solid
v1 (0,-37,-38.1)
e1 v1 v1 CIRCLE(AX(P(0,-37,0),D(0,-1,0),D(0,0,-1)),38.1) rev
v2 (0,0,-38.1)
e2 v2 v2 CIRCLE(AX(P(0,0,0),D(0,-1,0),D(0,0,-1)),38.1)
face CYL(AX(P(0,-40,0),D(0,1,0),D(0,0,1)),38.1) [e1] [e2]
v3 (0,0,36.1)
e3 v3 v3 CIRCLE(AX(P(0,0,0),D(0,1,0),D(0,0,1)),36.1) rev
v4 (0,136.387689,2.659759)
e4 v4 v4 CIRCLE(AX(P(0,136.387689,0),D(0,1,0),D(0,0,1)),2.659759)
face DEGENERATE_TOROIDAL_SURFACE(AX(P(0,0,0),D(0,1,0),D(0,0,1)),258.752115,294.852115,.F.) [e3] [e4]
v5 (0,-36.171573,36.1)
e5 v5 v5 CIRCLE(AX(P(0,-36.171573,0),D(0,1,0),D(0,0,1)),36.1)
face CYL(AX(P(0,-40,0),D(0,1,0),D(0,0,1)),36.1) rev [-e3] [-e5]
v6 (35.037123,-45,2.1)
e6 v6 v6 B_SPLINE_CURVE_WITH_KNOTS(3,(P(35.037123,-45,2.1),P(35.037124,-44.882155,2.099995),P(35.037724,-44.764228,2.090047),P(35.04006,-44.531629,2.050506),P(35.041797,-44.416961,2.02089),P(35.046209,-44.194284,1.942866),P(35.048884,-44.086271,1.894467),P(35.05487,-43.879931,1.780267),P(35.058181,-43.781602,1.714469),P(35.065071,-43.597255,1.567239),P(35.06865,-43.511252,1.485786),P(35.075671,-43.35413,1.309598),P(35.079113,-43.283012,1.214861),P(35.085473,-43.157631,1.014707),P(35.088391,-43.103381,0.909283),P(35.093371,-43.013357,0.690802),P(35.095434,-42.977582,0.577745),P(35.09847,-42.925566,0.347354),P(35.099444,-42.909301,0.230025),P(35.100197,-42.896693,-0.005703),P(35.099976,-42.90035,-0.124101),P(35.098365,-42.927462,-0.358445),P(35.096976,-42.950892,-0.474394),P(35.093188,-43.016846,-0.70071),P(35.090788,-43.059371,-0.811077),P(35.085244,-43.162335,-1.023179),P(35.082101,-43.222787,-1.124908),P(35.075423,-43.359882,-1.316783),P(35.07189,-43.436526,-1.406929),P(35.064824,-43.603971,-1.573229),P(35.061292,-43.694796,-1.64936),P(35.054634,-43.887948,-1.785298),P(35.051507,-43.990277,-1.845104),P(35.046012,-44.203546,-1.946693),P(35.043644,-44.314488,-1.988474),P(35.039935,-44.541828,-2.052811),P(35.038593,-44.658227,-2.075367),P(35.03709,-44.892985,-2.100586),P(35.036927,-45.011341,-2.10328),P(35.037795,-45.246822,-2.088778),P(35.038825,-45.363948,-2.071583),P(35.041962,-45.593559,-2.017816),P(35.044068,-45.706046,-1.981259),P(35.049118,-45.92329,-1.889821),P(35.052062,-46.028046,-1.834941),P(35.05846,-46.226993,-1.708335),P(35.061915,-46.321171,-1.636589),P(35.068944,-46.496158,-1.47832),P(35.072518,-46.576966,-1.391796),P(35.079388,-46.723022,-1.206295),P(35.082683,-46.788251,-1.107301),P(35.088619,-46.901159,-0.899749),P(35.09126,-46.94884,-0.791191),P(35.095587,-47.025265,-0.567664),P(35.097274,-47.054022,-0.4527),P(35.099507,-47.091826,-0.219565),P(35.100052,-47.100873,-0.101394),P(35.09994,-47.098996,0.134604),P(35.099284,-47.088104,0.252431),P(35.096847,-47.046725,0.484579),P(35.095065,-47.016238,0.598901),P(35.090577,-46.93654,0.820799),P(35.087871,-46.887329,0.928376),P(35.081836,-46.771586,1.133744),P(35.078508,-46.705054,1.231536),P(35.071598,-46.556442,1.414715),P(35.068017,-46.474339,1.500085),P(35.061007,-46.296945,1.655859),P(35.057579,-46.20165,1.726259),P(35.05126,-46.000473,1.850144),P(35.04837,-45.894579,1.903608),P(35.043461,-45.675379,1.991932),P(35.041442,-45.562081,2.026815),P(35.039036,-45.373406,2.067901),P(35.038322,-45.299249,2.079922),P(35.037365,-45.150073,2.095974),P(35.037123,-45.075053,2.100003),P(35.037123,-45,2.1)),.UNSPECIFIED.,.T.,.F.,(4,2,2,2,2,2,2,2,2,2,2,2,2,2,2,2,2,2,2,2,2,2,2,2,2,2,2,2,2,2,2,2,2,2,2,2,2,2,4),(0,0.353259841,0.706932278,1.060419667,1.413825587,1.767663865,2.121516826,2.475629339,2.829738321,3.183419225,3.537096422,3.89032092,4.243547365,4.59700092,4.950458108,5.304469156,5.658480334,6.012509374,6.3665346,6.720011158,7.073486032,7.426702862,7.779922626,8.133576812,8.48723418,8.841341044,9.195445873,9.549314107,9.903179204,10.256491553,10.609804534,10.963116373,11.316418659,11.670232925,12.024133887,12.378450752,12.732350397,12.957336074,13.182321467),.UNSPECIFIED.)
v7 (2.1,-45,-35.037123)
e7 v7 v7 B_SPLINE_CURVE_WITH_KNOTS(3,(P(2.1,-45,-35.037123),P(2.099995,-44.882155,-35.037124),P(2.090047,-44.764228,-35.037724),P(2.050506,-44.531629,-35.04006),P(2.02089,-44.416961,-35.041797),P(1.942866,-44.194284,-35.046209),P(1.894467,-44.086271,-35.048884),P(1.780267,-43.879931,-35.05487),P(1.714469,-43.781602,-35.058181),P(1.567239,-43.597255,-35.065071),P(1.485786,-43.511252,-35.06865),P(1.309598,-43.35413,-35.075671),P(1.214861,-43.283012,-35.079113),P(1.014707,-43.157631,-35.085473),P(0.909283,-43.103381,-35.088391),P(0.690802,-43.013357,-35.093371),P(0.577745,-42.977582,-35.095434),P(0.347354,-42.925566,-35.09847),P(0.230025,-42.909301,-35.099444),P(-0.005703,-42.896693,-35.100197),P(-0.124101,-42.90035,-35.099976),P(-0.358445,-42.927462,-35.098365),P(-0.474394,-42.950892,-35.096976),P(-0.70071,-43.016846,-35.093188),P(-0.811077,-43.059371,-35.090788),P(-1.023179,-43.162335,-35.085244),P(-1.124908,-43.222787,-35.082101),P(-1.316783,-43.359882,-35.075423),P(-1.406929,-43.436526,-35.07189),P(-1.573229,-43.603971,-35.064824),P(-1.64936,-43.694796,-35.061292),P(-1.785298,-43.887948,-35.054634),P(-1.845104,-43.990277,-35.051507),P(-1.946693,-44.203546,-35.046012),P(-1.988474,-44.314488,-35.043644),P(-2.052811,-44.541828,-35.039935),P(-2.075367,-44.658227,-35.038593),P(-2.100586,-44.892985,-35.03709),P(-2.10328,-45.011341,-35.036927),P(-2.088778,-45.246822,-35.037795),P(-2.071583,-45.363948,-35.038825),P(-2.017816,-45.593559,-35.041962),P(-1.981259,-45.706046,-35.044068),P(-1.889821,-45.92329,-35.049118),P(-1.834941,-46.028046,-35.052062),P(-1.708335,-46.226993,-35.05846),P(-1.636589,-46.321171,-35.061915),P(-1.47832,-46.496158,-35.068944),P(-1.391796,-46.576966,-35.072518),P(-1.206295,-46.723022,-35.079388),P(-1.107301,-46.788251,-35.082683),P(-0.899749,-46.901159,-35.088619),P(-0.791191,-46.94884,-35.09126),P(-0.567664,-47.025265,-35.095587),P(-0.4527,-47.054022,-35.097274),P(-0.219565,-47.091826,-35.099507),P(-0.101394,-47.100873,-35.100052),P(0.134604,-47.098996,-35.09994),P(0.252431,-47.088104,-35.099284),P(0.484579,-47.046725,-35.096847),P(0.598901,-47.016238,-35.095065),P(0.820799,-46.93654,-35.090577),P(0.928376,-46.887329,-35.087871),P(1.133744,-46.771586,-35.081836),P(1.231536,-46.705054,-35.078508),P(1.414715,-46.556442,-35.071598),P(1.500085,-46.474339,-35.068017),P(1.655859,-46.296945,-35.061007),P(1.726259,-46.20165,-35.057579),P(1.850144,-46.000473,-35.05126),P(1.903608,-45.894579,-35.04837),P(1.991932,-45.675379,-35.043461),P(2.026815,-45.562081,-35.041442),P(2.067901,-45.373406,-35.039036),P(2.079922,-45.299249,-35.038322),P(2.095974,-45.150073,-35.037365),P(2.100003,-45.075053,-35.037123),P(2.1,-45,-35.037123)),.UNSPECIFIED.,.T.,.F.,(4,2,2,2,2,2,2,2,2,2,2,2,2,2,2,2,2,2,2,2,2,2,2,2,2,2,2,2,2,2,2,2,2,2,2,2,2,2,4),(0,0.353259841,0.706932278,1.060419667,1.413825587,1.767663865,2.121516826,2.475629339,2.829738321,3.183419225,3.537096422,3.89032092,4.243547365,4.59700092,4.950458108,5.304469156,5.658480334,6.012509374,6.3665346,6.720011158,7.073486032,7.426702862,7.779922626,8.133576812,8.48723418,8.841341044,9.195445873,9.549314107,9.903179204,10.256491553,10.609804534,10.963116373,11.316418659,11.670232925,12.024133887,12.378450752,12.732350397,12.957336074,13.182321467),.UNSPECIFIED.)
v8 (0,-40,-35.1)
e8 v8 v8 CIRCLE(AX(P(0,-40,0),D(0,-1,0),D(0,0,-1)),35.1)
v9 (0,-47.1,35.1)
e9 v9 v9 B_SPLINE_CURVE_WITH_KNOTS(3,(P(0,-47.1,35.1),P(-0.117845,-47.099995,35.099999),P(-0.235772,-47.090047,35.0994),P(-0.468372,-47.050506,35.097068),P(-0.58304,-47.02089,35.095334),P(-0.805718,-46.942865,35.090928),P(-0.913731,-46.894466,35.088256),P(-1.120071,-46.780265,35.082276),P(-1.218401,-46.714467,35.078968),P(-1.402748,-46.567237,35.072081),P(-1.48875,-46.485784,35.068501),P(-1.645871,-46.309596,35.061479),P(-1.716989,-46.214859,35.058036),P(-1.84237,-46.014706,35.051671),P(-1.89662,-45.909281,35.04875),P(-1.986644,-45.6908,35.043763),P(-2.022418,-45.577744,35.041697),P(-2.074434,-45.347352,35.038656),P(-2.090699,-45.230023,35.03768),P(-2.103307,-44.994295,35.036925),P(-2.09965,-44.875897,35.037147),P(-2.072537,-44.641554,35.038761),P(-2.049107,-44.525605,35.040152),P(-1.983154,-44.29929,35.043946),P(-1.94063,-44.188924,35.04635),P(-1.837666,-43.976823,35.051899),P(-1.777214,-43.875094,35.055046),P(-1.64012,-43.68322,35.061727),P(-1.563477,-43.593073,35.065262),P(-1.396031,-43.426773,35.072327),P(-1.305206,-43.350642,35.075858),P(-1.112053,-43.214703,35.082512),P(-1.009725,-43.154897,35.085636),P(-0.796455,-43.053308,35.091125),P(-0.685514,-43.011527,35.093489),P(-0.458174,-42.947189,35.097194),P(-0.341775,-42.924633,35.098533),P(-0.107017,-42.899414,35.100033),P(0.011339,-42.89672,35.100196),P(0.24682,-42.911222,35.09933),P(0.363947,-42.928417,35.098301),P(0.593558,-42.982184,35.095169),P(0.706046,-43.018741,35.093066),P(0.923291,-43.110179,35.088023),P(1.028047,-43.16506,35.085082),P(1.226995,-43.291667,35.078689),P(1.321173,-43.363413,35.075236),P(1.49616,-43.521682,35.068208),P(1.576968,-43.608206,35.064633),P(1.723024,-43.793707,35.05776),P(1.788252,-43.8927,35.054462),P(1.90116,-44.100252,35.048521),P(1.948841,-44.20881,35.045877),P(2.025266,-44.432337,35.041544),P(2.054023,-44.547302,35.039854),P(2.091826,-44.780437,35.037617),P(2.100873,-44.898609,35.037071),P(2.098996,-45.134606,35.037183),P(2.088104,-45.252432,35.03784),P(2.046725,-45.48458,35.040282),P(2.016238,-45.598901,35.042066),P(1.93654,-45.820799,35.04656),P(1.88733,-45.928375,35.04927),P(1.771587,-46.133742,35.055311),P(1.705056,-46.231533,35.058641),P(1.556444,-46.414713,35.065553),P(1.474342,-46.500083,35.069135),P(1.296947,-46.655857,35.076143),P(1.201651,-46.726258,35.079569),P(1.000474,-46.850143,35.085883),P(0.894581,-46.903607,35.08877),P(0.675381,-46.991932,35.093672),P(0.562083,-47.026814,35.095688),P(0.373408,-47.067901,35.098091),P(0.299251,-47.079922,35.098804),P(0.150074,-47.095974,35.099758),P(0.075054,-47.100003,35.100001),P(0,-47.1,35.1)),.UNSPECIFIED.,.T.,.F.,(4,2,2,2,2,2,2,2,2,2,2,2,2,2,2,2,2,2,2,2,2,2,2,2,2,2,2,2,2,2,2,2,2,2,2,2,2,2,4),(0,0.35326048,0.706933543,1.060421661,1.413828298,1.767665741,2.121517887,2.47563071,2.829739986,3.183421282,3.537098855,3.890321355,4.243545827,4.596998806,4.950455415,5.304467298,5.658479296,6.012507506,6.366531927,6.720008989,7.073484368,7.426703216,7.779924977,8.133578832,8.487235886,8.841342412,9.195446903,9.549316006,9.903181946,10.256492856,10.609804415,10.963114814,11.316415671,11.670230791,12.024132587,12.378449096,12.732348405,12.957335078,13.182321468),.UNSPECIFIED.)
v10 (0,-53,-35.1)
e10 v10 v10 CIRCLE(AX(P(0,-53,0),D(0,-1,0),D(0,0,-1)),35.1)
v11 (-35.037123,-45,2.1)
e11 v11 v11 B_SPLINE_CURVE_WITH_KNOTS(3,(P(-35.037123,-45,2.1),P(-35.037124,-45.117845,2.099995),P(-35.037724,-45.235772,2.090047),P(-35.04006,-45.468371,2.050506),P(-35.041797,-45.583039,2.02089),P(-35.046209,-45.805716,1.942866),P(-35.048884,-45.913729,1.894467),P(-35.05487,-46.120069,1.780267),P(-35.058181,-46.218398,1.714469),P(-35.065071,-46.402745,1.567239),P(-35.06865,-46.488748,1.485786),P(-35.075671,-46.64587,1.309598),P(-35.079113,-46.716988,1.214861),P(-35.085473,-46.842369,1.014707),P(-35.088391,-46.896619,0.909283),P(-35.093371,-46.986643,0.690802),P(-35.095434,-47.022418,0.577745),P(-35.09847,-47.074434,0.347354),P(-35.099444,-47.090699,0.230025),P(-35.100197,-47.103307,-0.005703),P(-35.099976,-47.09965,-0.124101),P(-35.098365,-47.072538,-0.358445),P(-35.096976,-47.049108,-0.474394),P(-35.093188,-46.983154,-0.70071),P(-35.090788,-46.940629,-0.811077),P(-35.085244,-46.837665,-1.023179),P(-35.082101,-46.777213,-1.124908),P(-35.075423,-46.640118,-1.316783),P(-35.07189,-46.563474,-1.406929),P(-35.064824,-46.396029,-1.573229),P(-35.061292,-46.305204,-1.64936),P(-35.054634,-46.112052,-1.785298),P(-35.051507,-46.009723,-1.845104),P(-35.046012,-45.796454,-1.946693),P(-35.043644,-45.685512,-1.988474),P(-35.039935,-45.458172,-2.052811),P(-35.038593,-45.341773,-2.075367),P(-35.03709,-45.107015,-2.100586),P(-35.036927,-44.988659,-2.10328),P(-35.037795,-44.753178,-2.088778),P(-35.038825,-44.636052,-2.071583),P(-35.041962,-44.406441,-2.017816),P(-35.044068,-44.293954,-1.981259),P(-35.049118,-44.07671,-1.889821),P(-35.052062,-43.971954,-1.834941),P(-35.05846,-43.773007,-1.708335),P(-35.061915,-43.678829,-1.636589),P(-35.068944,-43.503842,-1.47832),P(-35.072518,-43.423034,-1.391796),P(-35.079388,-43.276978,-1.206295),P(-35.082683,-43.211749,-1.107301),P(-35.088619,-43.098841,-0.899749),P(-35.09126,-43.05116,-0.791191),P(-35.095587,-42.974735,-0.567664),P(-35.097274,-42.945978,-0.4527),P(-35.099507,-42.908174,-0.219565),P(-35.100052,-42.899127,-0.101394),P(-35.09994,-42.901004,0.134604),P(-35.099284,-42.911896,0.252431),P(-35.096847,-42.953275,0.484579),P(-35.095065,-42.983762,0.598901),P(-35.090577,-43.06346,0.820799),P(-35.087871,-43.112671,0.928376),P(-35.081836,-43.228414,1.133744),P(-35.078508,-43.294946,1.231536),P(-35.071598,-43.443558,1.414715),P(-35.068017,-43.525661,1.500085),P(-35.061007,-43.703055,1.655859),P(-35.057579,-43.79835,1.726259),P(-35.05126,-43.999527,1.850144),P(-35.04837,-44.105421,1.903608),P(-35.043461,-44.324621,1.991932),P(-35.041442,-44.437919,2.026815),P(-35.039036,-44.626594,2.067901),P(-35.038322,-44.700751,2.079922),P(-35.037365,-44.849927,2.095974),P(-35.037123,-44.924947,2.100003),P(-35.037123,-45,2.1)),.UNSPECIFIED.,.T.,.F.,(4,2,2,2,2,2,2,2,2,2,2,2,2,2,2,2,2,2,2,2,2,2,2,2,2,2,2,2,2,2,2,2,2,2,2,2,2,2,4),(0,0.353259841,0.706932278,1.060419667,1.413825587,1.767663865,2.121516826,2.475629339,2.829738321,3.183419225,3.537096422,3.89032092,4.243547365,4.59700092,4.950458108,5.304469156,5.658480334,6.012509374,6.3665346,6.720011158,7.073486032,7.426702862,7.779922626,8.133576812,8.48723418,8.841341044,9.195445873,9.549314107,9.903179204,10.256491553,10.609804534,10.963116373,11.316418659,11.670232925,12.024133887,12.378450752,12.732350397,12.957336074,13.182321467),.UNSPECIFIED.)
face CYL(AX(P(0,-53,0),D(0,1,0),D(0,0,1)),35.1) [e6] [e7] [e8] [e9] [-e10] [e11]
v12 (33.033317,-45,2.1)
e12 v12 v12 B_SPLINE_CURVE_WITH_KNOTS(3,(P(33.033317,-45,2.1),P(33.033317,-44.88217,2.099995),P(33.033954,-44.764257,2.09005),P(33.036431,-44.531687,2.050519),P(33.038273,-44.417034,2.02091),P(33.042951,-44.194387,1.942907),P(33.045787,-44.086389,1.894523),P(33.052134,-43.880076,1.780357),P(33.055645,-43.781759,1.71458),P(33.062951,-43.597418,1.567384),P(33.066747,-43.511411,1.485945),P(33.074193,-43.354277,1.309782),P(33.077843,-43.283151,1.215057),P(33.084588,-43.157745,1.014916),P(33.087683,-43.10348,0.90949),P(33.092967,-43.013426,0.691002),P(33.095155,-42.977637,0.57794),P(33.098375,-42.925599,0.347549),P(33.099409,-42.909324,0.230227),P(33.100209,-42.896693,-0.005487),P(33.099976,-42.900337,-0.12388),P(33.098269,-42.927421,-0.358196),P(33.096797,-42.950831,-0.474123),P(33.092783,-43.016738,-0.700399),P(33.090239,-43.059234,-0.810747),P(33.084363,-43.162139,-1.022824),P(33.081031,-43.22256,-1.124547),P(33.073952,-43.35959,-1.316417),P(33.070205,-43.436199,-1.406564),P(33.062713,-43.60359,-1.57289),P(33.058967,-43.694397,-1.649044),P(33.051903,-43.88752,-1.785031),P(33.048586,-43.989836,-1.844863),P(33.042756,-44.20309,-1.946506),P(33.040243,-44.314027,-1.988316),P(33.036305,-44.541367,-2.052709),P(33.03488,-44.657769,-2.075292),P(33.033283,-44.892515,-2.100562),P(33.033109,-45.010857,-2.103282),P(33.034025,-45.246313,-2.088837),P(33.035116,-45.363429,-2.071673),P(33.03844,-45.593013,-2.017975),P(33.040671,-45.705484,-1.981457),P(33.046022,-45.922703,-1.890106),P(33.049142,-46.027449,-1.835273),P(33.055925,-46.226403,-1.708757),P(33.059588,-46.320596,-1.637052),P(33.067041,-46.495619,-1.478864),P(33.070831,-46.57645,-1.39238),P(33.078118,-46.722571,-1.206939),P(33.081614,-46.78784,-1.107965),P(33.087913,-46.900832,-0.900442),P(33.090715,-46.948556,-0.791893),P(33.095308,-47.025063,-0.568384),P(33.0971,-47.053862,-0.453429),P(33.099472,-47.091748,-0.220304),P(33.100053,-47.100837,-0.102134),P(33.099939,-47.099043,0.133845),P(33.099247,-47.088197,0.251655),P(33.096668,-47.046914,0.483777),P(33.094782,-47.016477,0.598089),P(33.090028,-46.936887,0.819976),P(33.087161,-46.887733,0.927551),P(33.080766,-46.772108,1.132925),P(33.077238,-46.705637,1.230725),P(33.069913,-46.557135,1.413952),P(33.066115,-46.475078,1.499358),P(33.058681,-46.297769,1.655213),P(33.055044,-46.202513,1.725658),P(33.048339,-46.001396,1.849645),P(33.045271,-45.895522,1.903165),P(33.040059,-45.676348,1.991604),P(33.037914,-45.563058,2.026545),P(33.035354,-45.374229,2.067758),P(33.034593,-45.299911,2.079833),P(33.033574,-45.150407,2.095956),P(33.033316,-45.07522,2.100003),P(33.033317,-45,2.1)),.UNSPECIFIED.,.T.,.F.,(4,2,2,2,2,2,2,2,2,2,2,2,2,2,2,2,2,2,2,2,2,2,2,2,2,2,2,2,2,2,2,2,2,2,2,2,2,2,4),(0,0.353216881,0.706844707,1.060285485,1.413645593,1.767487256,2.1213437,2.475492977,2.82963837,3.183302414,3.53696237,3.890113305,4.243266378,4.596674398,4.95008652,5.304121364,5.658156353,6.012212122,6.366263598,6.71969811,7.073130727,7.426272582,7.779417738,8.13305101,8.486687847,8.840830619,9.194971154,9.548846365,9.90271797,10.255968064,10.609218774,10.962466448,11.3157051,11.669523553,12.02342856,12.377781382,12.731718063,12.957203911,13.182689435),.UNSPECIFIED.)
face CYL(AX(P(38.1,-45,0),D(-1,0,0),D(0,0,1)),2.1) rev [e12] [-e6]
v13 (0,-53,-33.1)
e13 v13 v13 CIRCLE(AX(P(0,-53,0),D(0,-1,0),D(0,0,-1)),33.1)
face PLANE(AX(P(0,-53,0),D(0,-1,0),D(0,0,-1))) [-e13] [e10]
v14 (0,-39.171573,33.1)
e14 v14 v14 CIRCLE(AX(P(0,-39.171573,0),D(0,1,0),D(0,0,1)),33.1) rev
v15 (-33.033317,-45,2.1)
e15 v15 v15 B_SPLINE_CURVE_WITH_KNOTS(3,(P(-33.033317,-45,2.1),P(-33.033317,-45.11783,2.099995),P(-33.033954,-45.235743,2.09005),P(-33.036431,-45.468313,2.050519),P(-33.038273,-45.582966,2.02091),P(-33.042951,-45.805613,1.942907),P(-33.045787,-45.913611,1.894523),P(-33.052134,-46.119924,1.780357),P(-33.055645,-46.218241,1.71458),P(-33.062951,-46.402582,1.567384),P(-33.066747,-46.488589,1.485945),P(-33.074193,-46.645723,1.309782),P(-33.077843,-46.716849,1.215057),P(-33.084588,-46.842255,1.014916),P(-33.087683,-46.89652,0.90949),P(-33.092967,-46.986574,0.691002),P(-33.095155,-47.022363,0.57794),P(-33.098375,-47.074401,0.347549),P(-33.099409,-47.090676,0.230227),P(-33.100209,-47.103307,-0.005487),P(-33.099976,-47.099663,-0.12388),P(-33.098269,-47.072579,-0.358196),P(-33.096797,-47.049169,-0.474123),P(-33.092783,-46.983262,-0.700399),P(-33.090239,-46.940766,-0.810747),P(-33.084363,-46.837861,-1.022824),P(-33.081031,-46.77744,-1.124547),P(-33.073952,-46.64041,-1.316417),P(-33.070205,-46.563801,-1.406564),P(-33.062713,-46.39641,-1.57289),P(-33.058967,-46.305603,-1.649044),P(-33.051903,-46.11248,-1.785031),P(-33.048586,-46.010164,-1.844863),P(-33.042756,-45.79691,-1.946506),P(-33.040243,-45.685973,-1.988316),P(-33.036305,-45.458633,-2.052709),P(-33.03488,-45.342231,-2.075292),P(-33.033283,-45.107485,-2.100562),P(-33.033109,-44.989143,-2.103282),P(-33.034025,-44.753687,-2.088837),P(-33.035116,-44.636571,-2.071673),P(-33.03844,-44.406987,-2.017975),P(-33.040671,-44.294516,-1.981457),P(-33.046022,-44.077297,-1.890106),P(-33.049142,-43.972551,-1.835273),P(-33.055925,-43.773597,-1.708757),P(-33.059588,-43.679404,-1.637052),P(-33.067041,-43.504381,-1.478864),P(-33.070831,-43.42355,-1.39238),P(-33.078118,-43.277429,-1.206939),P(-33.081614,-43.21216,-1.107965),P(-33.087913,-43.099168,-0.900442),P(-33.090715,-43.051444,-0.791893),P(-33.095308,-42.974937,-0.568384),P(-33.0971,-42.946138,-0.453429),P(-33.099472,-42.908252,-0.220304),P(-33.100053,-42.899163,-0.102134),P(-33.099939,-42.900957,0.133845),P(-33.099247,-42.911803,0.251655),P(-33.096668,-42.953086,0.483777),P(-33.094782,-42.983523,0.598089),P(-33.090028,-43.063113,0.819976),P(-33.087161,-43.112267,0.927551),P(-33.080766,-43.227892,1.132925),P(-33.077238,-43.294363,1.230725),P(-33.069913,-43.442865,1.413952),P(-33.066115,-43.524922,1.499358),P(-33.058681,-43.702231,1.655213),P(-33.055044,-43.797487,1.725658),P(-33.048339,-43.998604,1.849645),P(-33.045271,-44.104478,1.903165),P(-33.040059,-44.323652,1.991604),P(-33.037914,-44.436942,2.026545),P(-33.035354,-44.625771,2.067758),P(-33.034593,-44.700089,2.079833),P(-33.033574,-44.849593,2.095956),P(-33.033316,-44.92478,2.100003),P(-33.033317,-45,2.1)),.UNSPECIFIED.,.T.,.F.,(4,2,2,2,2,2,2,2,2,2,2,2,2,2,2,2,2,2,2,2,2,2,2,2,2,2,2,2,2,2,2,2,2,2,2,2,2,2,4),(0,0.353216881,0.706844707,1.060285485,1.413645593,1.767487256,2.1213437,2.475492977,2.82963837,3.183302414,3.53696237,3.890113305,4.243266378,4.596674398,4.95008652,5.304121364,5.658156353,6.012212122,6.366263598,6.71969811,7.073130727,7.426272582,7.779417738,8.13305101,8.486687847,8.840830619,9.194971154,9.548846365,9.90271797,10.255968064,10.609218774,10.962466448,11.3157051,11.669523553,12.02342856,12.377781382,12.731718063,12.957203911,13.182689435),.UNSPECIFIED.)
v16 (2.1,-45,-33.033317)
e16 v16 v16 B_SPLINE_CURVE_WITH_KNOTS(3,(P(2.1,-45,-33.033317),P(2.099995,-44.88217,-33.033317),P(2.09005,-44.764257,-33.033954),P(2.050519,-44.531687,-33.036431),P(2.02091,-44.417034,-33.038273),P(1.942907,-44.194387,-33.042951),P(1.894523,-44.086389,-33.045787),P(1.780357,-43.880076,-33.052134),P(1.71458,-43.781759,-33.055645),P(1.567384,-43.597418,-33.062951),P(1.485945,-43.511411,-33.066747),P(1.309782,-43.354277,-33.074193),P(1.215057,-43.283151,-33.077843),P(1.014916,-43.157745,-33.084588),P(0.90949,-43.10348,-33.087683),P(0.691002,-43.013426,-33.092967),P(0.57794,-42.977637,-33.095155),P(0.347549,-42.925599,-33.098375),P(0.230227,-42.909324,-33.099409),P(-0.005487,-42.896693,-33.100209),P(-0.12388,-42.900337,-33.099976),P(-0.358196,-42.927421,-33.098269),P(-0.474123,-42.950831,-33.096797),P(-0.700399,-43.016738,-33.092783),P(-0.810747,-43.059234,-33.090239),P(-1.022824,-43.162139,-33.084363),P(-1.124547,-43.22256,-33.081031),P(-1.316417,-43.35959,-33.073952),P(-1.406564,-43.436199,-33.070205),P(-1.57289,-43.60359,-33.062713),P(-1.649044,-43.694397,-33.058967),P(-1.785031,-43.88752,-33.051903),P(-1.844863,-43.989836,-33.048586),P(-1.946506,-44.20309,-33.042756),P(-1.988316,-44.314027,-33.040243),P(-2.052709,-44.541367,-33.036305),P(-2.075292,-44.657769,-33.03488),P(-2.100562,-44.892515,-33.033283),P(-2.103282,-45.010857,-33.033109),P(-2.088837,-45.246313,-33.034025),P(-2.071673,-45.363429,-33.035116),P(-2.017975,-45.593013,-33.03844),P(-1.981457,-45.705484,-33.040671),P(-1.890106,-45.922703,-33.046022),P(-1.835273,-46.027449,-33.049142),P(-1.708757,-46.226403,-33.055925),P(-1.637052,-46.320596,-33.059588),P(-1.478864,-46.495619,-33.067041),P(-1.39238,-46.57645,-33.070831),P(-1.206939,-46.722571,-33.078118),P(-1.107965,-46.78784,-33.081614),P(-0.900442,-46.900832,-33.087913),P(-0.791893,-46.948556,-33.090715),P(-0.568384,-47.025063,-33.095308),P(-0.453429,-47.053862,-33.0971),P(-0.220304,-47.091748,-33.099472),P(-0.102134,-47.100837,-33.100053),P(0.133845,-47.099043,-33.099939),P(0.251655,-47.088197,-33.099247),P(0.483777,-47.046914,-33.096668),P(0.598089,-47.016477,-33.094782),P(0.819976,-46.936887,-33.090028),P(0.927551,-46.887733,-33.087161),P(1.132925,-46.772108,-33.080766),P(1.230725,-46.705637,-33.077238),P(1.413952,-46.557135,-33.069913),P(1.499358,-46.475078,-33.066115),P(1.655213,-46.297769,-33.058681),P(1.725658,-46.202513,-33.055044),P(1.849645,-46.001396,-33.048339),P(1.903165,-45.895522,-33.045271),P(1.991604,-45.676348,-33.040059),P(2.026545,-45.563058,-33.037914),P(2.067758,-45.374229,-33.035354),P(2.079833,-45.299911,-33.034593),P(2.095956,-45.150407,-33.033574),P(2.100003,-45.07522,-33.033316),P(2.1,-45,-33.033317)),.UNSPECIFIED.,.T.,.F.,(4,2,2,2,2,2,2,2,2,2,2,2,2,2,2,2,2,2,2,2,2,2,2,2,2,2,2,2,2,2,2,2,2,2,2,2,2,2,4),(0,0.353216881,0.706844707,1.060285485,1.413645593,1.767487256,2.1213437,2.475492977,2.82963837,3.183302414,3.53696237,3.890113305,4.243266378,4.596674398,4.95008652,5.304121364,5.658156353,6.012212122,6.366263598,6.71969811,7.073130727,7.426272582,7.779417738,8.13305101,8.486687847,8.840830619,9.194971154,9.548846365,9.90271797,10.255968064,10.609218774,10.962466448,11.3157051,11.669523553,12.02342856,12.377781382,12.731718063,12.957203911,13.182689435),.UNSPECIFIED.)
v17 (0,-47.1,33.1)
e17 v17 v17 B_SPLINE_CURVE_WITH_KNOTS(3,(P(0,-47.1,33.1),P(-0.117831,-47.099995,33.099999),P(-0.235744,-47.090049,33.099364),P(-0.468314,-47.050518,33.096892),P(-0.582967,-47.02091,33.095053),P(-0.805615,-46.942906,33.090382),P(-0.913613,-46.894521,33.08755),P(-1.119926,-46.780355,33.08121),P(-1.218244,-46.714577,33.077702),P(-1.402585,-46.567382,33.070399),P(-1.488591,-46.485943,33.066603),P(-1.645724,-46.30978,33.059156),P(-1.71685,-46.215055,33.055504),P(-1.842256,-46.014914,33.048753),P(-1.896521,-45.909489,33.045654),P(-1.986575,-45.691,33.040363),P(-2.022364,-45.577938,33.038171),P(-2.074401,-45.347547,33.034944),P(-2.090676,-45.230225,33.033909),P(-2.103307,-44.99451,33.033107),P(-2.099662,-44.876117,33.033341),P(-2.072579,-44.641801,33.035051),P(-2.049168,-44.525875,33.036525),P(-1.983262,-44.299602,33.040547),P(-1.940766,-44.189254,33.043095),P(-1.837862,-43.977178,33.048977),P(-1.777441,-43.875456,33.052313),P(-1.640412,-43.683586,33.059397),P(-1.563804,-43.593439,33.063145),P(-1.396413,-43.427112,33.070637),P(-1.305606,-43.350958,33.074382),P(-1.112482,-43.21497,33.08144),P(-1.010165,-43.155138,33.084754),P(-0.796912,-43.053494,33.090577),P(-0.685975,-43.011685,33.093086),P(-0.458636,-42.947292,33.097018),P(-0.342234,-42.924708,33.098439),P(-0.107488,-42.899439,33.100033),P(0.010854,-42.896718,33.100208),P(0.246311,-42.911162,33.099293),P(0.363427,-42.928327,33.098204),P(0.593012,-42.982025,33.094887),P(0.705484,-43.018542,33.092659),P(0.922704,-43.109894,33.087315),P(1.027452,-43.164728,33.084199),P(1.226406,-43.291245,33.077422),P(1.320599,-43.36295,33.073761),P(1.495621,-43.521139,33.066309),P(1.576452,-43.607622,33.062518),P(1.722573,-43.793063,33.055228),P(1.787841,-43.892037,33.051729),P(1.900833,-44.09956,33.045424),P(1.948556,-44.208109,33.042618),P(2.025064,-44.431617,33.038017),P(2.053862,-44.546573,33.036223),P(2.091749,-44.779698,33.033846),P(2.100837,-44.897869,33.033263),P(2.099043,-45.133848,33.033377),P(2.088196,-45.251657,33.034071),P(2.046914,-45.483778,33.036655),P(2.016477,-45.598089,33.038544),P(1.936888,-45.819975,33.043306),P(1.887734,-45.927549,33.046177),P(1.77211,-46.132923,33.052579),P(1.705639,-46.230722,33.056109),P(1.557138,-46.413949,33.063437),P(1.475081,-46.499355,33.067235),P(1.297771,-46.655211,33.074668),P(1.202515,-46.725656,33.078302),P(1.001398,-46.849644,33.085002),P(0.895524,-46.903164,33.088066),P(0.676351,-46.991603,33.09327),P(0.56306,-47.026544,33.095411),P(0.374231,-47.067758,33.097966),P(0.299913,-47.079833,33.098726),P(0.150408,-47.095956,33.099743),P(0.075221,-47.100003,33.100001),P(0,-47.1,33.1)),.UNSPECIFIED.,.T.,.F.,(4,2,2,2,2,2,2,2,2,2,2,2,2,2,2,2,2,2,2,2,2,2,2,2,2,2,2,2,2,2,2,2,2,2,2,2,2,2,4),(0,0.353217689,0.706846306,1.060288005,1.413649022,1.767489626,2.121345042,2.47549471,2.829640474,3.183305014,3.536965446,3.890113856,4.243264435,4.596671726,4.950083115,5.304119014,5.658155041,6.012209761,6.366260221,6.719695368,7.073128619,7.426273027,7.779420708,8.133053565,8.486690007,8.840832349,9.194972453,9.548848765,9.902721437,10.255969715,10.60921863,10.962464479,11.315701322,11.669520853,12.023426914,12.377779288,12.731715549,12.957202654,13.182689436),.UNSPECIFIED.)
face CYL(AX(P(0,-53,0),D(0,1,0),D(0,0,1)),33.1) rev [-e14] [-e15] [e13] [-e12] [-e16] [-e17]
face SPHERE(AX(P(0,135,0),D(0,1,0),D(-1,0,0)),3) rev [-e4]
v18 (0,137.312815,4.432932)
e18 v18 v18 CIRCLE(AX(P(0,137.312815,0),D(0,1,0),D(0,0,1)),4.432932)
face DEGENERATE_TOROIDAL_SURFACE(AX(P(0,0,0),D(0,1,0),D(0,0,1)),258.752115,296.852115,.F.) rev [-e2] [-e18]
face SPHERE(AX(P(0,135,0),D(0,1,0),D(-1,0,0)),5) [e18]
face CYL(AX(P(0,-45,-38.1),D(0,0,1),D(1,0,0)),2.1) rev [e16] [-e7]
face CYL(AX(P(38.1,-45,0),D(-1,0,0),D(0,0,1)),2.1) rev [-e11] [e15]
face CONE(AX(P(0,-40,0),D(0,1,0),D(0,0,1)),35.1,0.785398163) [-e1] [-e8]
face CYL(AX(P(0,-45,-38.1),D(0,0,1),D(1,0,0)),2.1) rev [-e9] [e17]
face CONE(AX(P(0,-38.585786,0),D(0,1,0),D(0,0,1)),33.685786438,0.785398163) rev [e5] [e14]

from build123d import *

# Parameters (mm, degrees)
SKETCH2_R           = 38.1
BOSS_EXTRUDE1_DEPTH = 40
SKETCH3_R           = 35.1
BOSS_EXTRUDE2_DEPTH = 13
CHAMFER1_SIZE       = 3
SKETCH4_R           = 2.1
CUT_EXTRUDE1_DEPTH  = 151.010733
CIRPATTERN1_COUNT   = 2
CIRPATTERN1_ANGLE   = 90


# Read off the part's stored shape, not the designer's step: Shell1
with BuildPart() as part:
    # Sketch1 → Revolve1 (revolve)
    with BuildSketch(Plane.XY, mode=Mode.PRIVATE) as revolve1_sk:
        with BuildLine():
            Line((0, 0), (-38.1, 0))
            ThreePointArc((-38.1, 0), (-29.56040295, 70.689958057), (-4.432931983, 137.312815175))
            ThreePointArc((-4.432931983, 137.312815175), (-2.591903174, 139.275749985), (0, 140))
            Line((0, 140), (0, 0))
        make_face()
    revolve(revolve1_sk.sketch.rotate(Axis((0, 140, 0), (0, -1, 0)), 270), axis=Axis((0, 140, 0), (0, -1, 0)))

    # Sketch2 → Boss-Extrude1 (add)
    with BuildSketch(Plane.XZ):
        with Locations(Location((0, 0, 0), (0, 0, 270))):
            Circle(SKETCH2_R)
    extrude(amount=BOSS_EXTRUDE1_DEPTH)

    # Sketch3 → Boss-Extrude2 (add)
    with BuildSketch(Plane.XZ.offset(40)):
        with Locations(Location((0, 0, 0), (0, 0, 90))):
            Circle(SKETCH3_R)
    extrude(amount=BOSS_EXTRUDE2_DEPTH)

    # Chamfer1
    chamfer1_edges = [part.edges().sort_by_distance(p)[0] for p in [
        (0, -40, 38.1),
    ]]
    chamfer(chamfer1_edges, length=CHAMFER1_SIZE - 0.0001)  # a hair under: the kernel refuses the full size

    # Shell1 outline → Shell1 (revolve, cut)
    with BuildSketch(Plane.XY):
        with BuildLine():
            ThreePointArc((2.659759191, 136.387689102), (1.555141906, 137.56544999), (0, 138))
            Line((0, 138), (0, -53))
            Line((0, -53), (33.1, -53))
            Line((33.1, -53), (33.1, -39.171572875))
            Line((33.1, -39.171572875), (36.1, -36.171572875))
            Line((36.1, -36.171572875), (36.1, 0))
            ThreePointArc((36.1, 0), (27.617937302, 70.213694256), (2.659759191, 136.387689102))
        make_face()
    revolve(axis=Axis((0, 0, 0), (0, 1, 0)), mode=Mode.SUBTRACT)

    # Sketch4 → Cut-Extrude1 (cut, symmetric)
    with BuildSketch(Plane.XY):
        with Locations((0, -45)):
            Circle(SKETCH4_R)
    cut_extrude1 = extrude(amount=CUT_EXTRUDE1_DEPTH, both=True, mode=Mode.SUBTRACT)

    # CirPattern1: Cut-Extrude1 ×2 about axis
    cirpattern1_axis = Axis((0, -53, 0), (0, 1, 0))
    for i in range(1, CIRPATTERN1_COUNT):
        add(cut_extrude1.rotate(cirpattern1_axis, i * CIRPATTERN1_ANGLE / (CIRPATTERN1_COUNT - 1)), mode=Mode.SUBTRACT)


solid = part.part
